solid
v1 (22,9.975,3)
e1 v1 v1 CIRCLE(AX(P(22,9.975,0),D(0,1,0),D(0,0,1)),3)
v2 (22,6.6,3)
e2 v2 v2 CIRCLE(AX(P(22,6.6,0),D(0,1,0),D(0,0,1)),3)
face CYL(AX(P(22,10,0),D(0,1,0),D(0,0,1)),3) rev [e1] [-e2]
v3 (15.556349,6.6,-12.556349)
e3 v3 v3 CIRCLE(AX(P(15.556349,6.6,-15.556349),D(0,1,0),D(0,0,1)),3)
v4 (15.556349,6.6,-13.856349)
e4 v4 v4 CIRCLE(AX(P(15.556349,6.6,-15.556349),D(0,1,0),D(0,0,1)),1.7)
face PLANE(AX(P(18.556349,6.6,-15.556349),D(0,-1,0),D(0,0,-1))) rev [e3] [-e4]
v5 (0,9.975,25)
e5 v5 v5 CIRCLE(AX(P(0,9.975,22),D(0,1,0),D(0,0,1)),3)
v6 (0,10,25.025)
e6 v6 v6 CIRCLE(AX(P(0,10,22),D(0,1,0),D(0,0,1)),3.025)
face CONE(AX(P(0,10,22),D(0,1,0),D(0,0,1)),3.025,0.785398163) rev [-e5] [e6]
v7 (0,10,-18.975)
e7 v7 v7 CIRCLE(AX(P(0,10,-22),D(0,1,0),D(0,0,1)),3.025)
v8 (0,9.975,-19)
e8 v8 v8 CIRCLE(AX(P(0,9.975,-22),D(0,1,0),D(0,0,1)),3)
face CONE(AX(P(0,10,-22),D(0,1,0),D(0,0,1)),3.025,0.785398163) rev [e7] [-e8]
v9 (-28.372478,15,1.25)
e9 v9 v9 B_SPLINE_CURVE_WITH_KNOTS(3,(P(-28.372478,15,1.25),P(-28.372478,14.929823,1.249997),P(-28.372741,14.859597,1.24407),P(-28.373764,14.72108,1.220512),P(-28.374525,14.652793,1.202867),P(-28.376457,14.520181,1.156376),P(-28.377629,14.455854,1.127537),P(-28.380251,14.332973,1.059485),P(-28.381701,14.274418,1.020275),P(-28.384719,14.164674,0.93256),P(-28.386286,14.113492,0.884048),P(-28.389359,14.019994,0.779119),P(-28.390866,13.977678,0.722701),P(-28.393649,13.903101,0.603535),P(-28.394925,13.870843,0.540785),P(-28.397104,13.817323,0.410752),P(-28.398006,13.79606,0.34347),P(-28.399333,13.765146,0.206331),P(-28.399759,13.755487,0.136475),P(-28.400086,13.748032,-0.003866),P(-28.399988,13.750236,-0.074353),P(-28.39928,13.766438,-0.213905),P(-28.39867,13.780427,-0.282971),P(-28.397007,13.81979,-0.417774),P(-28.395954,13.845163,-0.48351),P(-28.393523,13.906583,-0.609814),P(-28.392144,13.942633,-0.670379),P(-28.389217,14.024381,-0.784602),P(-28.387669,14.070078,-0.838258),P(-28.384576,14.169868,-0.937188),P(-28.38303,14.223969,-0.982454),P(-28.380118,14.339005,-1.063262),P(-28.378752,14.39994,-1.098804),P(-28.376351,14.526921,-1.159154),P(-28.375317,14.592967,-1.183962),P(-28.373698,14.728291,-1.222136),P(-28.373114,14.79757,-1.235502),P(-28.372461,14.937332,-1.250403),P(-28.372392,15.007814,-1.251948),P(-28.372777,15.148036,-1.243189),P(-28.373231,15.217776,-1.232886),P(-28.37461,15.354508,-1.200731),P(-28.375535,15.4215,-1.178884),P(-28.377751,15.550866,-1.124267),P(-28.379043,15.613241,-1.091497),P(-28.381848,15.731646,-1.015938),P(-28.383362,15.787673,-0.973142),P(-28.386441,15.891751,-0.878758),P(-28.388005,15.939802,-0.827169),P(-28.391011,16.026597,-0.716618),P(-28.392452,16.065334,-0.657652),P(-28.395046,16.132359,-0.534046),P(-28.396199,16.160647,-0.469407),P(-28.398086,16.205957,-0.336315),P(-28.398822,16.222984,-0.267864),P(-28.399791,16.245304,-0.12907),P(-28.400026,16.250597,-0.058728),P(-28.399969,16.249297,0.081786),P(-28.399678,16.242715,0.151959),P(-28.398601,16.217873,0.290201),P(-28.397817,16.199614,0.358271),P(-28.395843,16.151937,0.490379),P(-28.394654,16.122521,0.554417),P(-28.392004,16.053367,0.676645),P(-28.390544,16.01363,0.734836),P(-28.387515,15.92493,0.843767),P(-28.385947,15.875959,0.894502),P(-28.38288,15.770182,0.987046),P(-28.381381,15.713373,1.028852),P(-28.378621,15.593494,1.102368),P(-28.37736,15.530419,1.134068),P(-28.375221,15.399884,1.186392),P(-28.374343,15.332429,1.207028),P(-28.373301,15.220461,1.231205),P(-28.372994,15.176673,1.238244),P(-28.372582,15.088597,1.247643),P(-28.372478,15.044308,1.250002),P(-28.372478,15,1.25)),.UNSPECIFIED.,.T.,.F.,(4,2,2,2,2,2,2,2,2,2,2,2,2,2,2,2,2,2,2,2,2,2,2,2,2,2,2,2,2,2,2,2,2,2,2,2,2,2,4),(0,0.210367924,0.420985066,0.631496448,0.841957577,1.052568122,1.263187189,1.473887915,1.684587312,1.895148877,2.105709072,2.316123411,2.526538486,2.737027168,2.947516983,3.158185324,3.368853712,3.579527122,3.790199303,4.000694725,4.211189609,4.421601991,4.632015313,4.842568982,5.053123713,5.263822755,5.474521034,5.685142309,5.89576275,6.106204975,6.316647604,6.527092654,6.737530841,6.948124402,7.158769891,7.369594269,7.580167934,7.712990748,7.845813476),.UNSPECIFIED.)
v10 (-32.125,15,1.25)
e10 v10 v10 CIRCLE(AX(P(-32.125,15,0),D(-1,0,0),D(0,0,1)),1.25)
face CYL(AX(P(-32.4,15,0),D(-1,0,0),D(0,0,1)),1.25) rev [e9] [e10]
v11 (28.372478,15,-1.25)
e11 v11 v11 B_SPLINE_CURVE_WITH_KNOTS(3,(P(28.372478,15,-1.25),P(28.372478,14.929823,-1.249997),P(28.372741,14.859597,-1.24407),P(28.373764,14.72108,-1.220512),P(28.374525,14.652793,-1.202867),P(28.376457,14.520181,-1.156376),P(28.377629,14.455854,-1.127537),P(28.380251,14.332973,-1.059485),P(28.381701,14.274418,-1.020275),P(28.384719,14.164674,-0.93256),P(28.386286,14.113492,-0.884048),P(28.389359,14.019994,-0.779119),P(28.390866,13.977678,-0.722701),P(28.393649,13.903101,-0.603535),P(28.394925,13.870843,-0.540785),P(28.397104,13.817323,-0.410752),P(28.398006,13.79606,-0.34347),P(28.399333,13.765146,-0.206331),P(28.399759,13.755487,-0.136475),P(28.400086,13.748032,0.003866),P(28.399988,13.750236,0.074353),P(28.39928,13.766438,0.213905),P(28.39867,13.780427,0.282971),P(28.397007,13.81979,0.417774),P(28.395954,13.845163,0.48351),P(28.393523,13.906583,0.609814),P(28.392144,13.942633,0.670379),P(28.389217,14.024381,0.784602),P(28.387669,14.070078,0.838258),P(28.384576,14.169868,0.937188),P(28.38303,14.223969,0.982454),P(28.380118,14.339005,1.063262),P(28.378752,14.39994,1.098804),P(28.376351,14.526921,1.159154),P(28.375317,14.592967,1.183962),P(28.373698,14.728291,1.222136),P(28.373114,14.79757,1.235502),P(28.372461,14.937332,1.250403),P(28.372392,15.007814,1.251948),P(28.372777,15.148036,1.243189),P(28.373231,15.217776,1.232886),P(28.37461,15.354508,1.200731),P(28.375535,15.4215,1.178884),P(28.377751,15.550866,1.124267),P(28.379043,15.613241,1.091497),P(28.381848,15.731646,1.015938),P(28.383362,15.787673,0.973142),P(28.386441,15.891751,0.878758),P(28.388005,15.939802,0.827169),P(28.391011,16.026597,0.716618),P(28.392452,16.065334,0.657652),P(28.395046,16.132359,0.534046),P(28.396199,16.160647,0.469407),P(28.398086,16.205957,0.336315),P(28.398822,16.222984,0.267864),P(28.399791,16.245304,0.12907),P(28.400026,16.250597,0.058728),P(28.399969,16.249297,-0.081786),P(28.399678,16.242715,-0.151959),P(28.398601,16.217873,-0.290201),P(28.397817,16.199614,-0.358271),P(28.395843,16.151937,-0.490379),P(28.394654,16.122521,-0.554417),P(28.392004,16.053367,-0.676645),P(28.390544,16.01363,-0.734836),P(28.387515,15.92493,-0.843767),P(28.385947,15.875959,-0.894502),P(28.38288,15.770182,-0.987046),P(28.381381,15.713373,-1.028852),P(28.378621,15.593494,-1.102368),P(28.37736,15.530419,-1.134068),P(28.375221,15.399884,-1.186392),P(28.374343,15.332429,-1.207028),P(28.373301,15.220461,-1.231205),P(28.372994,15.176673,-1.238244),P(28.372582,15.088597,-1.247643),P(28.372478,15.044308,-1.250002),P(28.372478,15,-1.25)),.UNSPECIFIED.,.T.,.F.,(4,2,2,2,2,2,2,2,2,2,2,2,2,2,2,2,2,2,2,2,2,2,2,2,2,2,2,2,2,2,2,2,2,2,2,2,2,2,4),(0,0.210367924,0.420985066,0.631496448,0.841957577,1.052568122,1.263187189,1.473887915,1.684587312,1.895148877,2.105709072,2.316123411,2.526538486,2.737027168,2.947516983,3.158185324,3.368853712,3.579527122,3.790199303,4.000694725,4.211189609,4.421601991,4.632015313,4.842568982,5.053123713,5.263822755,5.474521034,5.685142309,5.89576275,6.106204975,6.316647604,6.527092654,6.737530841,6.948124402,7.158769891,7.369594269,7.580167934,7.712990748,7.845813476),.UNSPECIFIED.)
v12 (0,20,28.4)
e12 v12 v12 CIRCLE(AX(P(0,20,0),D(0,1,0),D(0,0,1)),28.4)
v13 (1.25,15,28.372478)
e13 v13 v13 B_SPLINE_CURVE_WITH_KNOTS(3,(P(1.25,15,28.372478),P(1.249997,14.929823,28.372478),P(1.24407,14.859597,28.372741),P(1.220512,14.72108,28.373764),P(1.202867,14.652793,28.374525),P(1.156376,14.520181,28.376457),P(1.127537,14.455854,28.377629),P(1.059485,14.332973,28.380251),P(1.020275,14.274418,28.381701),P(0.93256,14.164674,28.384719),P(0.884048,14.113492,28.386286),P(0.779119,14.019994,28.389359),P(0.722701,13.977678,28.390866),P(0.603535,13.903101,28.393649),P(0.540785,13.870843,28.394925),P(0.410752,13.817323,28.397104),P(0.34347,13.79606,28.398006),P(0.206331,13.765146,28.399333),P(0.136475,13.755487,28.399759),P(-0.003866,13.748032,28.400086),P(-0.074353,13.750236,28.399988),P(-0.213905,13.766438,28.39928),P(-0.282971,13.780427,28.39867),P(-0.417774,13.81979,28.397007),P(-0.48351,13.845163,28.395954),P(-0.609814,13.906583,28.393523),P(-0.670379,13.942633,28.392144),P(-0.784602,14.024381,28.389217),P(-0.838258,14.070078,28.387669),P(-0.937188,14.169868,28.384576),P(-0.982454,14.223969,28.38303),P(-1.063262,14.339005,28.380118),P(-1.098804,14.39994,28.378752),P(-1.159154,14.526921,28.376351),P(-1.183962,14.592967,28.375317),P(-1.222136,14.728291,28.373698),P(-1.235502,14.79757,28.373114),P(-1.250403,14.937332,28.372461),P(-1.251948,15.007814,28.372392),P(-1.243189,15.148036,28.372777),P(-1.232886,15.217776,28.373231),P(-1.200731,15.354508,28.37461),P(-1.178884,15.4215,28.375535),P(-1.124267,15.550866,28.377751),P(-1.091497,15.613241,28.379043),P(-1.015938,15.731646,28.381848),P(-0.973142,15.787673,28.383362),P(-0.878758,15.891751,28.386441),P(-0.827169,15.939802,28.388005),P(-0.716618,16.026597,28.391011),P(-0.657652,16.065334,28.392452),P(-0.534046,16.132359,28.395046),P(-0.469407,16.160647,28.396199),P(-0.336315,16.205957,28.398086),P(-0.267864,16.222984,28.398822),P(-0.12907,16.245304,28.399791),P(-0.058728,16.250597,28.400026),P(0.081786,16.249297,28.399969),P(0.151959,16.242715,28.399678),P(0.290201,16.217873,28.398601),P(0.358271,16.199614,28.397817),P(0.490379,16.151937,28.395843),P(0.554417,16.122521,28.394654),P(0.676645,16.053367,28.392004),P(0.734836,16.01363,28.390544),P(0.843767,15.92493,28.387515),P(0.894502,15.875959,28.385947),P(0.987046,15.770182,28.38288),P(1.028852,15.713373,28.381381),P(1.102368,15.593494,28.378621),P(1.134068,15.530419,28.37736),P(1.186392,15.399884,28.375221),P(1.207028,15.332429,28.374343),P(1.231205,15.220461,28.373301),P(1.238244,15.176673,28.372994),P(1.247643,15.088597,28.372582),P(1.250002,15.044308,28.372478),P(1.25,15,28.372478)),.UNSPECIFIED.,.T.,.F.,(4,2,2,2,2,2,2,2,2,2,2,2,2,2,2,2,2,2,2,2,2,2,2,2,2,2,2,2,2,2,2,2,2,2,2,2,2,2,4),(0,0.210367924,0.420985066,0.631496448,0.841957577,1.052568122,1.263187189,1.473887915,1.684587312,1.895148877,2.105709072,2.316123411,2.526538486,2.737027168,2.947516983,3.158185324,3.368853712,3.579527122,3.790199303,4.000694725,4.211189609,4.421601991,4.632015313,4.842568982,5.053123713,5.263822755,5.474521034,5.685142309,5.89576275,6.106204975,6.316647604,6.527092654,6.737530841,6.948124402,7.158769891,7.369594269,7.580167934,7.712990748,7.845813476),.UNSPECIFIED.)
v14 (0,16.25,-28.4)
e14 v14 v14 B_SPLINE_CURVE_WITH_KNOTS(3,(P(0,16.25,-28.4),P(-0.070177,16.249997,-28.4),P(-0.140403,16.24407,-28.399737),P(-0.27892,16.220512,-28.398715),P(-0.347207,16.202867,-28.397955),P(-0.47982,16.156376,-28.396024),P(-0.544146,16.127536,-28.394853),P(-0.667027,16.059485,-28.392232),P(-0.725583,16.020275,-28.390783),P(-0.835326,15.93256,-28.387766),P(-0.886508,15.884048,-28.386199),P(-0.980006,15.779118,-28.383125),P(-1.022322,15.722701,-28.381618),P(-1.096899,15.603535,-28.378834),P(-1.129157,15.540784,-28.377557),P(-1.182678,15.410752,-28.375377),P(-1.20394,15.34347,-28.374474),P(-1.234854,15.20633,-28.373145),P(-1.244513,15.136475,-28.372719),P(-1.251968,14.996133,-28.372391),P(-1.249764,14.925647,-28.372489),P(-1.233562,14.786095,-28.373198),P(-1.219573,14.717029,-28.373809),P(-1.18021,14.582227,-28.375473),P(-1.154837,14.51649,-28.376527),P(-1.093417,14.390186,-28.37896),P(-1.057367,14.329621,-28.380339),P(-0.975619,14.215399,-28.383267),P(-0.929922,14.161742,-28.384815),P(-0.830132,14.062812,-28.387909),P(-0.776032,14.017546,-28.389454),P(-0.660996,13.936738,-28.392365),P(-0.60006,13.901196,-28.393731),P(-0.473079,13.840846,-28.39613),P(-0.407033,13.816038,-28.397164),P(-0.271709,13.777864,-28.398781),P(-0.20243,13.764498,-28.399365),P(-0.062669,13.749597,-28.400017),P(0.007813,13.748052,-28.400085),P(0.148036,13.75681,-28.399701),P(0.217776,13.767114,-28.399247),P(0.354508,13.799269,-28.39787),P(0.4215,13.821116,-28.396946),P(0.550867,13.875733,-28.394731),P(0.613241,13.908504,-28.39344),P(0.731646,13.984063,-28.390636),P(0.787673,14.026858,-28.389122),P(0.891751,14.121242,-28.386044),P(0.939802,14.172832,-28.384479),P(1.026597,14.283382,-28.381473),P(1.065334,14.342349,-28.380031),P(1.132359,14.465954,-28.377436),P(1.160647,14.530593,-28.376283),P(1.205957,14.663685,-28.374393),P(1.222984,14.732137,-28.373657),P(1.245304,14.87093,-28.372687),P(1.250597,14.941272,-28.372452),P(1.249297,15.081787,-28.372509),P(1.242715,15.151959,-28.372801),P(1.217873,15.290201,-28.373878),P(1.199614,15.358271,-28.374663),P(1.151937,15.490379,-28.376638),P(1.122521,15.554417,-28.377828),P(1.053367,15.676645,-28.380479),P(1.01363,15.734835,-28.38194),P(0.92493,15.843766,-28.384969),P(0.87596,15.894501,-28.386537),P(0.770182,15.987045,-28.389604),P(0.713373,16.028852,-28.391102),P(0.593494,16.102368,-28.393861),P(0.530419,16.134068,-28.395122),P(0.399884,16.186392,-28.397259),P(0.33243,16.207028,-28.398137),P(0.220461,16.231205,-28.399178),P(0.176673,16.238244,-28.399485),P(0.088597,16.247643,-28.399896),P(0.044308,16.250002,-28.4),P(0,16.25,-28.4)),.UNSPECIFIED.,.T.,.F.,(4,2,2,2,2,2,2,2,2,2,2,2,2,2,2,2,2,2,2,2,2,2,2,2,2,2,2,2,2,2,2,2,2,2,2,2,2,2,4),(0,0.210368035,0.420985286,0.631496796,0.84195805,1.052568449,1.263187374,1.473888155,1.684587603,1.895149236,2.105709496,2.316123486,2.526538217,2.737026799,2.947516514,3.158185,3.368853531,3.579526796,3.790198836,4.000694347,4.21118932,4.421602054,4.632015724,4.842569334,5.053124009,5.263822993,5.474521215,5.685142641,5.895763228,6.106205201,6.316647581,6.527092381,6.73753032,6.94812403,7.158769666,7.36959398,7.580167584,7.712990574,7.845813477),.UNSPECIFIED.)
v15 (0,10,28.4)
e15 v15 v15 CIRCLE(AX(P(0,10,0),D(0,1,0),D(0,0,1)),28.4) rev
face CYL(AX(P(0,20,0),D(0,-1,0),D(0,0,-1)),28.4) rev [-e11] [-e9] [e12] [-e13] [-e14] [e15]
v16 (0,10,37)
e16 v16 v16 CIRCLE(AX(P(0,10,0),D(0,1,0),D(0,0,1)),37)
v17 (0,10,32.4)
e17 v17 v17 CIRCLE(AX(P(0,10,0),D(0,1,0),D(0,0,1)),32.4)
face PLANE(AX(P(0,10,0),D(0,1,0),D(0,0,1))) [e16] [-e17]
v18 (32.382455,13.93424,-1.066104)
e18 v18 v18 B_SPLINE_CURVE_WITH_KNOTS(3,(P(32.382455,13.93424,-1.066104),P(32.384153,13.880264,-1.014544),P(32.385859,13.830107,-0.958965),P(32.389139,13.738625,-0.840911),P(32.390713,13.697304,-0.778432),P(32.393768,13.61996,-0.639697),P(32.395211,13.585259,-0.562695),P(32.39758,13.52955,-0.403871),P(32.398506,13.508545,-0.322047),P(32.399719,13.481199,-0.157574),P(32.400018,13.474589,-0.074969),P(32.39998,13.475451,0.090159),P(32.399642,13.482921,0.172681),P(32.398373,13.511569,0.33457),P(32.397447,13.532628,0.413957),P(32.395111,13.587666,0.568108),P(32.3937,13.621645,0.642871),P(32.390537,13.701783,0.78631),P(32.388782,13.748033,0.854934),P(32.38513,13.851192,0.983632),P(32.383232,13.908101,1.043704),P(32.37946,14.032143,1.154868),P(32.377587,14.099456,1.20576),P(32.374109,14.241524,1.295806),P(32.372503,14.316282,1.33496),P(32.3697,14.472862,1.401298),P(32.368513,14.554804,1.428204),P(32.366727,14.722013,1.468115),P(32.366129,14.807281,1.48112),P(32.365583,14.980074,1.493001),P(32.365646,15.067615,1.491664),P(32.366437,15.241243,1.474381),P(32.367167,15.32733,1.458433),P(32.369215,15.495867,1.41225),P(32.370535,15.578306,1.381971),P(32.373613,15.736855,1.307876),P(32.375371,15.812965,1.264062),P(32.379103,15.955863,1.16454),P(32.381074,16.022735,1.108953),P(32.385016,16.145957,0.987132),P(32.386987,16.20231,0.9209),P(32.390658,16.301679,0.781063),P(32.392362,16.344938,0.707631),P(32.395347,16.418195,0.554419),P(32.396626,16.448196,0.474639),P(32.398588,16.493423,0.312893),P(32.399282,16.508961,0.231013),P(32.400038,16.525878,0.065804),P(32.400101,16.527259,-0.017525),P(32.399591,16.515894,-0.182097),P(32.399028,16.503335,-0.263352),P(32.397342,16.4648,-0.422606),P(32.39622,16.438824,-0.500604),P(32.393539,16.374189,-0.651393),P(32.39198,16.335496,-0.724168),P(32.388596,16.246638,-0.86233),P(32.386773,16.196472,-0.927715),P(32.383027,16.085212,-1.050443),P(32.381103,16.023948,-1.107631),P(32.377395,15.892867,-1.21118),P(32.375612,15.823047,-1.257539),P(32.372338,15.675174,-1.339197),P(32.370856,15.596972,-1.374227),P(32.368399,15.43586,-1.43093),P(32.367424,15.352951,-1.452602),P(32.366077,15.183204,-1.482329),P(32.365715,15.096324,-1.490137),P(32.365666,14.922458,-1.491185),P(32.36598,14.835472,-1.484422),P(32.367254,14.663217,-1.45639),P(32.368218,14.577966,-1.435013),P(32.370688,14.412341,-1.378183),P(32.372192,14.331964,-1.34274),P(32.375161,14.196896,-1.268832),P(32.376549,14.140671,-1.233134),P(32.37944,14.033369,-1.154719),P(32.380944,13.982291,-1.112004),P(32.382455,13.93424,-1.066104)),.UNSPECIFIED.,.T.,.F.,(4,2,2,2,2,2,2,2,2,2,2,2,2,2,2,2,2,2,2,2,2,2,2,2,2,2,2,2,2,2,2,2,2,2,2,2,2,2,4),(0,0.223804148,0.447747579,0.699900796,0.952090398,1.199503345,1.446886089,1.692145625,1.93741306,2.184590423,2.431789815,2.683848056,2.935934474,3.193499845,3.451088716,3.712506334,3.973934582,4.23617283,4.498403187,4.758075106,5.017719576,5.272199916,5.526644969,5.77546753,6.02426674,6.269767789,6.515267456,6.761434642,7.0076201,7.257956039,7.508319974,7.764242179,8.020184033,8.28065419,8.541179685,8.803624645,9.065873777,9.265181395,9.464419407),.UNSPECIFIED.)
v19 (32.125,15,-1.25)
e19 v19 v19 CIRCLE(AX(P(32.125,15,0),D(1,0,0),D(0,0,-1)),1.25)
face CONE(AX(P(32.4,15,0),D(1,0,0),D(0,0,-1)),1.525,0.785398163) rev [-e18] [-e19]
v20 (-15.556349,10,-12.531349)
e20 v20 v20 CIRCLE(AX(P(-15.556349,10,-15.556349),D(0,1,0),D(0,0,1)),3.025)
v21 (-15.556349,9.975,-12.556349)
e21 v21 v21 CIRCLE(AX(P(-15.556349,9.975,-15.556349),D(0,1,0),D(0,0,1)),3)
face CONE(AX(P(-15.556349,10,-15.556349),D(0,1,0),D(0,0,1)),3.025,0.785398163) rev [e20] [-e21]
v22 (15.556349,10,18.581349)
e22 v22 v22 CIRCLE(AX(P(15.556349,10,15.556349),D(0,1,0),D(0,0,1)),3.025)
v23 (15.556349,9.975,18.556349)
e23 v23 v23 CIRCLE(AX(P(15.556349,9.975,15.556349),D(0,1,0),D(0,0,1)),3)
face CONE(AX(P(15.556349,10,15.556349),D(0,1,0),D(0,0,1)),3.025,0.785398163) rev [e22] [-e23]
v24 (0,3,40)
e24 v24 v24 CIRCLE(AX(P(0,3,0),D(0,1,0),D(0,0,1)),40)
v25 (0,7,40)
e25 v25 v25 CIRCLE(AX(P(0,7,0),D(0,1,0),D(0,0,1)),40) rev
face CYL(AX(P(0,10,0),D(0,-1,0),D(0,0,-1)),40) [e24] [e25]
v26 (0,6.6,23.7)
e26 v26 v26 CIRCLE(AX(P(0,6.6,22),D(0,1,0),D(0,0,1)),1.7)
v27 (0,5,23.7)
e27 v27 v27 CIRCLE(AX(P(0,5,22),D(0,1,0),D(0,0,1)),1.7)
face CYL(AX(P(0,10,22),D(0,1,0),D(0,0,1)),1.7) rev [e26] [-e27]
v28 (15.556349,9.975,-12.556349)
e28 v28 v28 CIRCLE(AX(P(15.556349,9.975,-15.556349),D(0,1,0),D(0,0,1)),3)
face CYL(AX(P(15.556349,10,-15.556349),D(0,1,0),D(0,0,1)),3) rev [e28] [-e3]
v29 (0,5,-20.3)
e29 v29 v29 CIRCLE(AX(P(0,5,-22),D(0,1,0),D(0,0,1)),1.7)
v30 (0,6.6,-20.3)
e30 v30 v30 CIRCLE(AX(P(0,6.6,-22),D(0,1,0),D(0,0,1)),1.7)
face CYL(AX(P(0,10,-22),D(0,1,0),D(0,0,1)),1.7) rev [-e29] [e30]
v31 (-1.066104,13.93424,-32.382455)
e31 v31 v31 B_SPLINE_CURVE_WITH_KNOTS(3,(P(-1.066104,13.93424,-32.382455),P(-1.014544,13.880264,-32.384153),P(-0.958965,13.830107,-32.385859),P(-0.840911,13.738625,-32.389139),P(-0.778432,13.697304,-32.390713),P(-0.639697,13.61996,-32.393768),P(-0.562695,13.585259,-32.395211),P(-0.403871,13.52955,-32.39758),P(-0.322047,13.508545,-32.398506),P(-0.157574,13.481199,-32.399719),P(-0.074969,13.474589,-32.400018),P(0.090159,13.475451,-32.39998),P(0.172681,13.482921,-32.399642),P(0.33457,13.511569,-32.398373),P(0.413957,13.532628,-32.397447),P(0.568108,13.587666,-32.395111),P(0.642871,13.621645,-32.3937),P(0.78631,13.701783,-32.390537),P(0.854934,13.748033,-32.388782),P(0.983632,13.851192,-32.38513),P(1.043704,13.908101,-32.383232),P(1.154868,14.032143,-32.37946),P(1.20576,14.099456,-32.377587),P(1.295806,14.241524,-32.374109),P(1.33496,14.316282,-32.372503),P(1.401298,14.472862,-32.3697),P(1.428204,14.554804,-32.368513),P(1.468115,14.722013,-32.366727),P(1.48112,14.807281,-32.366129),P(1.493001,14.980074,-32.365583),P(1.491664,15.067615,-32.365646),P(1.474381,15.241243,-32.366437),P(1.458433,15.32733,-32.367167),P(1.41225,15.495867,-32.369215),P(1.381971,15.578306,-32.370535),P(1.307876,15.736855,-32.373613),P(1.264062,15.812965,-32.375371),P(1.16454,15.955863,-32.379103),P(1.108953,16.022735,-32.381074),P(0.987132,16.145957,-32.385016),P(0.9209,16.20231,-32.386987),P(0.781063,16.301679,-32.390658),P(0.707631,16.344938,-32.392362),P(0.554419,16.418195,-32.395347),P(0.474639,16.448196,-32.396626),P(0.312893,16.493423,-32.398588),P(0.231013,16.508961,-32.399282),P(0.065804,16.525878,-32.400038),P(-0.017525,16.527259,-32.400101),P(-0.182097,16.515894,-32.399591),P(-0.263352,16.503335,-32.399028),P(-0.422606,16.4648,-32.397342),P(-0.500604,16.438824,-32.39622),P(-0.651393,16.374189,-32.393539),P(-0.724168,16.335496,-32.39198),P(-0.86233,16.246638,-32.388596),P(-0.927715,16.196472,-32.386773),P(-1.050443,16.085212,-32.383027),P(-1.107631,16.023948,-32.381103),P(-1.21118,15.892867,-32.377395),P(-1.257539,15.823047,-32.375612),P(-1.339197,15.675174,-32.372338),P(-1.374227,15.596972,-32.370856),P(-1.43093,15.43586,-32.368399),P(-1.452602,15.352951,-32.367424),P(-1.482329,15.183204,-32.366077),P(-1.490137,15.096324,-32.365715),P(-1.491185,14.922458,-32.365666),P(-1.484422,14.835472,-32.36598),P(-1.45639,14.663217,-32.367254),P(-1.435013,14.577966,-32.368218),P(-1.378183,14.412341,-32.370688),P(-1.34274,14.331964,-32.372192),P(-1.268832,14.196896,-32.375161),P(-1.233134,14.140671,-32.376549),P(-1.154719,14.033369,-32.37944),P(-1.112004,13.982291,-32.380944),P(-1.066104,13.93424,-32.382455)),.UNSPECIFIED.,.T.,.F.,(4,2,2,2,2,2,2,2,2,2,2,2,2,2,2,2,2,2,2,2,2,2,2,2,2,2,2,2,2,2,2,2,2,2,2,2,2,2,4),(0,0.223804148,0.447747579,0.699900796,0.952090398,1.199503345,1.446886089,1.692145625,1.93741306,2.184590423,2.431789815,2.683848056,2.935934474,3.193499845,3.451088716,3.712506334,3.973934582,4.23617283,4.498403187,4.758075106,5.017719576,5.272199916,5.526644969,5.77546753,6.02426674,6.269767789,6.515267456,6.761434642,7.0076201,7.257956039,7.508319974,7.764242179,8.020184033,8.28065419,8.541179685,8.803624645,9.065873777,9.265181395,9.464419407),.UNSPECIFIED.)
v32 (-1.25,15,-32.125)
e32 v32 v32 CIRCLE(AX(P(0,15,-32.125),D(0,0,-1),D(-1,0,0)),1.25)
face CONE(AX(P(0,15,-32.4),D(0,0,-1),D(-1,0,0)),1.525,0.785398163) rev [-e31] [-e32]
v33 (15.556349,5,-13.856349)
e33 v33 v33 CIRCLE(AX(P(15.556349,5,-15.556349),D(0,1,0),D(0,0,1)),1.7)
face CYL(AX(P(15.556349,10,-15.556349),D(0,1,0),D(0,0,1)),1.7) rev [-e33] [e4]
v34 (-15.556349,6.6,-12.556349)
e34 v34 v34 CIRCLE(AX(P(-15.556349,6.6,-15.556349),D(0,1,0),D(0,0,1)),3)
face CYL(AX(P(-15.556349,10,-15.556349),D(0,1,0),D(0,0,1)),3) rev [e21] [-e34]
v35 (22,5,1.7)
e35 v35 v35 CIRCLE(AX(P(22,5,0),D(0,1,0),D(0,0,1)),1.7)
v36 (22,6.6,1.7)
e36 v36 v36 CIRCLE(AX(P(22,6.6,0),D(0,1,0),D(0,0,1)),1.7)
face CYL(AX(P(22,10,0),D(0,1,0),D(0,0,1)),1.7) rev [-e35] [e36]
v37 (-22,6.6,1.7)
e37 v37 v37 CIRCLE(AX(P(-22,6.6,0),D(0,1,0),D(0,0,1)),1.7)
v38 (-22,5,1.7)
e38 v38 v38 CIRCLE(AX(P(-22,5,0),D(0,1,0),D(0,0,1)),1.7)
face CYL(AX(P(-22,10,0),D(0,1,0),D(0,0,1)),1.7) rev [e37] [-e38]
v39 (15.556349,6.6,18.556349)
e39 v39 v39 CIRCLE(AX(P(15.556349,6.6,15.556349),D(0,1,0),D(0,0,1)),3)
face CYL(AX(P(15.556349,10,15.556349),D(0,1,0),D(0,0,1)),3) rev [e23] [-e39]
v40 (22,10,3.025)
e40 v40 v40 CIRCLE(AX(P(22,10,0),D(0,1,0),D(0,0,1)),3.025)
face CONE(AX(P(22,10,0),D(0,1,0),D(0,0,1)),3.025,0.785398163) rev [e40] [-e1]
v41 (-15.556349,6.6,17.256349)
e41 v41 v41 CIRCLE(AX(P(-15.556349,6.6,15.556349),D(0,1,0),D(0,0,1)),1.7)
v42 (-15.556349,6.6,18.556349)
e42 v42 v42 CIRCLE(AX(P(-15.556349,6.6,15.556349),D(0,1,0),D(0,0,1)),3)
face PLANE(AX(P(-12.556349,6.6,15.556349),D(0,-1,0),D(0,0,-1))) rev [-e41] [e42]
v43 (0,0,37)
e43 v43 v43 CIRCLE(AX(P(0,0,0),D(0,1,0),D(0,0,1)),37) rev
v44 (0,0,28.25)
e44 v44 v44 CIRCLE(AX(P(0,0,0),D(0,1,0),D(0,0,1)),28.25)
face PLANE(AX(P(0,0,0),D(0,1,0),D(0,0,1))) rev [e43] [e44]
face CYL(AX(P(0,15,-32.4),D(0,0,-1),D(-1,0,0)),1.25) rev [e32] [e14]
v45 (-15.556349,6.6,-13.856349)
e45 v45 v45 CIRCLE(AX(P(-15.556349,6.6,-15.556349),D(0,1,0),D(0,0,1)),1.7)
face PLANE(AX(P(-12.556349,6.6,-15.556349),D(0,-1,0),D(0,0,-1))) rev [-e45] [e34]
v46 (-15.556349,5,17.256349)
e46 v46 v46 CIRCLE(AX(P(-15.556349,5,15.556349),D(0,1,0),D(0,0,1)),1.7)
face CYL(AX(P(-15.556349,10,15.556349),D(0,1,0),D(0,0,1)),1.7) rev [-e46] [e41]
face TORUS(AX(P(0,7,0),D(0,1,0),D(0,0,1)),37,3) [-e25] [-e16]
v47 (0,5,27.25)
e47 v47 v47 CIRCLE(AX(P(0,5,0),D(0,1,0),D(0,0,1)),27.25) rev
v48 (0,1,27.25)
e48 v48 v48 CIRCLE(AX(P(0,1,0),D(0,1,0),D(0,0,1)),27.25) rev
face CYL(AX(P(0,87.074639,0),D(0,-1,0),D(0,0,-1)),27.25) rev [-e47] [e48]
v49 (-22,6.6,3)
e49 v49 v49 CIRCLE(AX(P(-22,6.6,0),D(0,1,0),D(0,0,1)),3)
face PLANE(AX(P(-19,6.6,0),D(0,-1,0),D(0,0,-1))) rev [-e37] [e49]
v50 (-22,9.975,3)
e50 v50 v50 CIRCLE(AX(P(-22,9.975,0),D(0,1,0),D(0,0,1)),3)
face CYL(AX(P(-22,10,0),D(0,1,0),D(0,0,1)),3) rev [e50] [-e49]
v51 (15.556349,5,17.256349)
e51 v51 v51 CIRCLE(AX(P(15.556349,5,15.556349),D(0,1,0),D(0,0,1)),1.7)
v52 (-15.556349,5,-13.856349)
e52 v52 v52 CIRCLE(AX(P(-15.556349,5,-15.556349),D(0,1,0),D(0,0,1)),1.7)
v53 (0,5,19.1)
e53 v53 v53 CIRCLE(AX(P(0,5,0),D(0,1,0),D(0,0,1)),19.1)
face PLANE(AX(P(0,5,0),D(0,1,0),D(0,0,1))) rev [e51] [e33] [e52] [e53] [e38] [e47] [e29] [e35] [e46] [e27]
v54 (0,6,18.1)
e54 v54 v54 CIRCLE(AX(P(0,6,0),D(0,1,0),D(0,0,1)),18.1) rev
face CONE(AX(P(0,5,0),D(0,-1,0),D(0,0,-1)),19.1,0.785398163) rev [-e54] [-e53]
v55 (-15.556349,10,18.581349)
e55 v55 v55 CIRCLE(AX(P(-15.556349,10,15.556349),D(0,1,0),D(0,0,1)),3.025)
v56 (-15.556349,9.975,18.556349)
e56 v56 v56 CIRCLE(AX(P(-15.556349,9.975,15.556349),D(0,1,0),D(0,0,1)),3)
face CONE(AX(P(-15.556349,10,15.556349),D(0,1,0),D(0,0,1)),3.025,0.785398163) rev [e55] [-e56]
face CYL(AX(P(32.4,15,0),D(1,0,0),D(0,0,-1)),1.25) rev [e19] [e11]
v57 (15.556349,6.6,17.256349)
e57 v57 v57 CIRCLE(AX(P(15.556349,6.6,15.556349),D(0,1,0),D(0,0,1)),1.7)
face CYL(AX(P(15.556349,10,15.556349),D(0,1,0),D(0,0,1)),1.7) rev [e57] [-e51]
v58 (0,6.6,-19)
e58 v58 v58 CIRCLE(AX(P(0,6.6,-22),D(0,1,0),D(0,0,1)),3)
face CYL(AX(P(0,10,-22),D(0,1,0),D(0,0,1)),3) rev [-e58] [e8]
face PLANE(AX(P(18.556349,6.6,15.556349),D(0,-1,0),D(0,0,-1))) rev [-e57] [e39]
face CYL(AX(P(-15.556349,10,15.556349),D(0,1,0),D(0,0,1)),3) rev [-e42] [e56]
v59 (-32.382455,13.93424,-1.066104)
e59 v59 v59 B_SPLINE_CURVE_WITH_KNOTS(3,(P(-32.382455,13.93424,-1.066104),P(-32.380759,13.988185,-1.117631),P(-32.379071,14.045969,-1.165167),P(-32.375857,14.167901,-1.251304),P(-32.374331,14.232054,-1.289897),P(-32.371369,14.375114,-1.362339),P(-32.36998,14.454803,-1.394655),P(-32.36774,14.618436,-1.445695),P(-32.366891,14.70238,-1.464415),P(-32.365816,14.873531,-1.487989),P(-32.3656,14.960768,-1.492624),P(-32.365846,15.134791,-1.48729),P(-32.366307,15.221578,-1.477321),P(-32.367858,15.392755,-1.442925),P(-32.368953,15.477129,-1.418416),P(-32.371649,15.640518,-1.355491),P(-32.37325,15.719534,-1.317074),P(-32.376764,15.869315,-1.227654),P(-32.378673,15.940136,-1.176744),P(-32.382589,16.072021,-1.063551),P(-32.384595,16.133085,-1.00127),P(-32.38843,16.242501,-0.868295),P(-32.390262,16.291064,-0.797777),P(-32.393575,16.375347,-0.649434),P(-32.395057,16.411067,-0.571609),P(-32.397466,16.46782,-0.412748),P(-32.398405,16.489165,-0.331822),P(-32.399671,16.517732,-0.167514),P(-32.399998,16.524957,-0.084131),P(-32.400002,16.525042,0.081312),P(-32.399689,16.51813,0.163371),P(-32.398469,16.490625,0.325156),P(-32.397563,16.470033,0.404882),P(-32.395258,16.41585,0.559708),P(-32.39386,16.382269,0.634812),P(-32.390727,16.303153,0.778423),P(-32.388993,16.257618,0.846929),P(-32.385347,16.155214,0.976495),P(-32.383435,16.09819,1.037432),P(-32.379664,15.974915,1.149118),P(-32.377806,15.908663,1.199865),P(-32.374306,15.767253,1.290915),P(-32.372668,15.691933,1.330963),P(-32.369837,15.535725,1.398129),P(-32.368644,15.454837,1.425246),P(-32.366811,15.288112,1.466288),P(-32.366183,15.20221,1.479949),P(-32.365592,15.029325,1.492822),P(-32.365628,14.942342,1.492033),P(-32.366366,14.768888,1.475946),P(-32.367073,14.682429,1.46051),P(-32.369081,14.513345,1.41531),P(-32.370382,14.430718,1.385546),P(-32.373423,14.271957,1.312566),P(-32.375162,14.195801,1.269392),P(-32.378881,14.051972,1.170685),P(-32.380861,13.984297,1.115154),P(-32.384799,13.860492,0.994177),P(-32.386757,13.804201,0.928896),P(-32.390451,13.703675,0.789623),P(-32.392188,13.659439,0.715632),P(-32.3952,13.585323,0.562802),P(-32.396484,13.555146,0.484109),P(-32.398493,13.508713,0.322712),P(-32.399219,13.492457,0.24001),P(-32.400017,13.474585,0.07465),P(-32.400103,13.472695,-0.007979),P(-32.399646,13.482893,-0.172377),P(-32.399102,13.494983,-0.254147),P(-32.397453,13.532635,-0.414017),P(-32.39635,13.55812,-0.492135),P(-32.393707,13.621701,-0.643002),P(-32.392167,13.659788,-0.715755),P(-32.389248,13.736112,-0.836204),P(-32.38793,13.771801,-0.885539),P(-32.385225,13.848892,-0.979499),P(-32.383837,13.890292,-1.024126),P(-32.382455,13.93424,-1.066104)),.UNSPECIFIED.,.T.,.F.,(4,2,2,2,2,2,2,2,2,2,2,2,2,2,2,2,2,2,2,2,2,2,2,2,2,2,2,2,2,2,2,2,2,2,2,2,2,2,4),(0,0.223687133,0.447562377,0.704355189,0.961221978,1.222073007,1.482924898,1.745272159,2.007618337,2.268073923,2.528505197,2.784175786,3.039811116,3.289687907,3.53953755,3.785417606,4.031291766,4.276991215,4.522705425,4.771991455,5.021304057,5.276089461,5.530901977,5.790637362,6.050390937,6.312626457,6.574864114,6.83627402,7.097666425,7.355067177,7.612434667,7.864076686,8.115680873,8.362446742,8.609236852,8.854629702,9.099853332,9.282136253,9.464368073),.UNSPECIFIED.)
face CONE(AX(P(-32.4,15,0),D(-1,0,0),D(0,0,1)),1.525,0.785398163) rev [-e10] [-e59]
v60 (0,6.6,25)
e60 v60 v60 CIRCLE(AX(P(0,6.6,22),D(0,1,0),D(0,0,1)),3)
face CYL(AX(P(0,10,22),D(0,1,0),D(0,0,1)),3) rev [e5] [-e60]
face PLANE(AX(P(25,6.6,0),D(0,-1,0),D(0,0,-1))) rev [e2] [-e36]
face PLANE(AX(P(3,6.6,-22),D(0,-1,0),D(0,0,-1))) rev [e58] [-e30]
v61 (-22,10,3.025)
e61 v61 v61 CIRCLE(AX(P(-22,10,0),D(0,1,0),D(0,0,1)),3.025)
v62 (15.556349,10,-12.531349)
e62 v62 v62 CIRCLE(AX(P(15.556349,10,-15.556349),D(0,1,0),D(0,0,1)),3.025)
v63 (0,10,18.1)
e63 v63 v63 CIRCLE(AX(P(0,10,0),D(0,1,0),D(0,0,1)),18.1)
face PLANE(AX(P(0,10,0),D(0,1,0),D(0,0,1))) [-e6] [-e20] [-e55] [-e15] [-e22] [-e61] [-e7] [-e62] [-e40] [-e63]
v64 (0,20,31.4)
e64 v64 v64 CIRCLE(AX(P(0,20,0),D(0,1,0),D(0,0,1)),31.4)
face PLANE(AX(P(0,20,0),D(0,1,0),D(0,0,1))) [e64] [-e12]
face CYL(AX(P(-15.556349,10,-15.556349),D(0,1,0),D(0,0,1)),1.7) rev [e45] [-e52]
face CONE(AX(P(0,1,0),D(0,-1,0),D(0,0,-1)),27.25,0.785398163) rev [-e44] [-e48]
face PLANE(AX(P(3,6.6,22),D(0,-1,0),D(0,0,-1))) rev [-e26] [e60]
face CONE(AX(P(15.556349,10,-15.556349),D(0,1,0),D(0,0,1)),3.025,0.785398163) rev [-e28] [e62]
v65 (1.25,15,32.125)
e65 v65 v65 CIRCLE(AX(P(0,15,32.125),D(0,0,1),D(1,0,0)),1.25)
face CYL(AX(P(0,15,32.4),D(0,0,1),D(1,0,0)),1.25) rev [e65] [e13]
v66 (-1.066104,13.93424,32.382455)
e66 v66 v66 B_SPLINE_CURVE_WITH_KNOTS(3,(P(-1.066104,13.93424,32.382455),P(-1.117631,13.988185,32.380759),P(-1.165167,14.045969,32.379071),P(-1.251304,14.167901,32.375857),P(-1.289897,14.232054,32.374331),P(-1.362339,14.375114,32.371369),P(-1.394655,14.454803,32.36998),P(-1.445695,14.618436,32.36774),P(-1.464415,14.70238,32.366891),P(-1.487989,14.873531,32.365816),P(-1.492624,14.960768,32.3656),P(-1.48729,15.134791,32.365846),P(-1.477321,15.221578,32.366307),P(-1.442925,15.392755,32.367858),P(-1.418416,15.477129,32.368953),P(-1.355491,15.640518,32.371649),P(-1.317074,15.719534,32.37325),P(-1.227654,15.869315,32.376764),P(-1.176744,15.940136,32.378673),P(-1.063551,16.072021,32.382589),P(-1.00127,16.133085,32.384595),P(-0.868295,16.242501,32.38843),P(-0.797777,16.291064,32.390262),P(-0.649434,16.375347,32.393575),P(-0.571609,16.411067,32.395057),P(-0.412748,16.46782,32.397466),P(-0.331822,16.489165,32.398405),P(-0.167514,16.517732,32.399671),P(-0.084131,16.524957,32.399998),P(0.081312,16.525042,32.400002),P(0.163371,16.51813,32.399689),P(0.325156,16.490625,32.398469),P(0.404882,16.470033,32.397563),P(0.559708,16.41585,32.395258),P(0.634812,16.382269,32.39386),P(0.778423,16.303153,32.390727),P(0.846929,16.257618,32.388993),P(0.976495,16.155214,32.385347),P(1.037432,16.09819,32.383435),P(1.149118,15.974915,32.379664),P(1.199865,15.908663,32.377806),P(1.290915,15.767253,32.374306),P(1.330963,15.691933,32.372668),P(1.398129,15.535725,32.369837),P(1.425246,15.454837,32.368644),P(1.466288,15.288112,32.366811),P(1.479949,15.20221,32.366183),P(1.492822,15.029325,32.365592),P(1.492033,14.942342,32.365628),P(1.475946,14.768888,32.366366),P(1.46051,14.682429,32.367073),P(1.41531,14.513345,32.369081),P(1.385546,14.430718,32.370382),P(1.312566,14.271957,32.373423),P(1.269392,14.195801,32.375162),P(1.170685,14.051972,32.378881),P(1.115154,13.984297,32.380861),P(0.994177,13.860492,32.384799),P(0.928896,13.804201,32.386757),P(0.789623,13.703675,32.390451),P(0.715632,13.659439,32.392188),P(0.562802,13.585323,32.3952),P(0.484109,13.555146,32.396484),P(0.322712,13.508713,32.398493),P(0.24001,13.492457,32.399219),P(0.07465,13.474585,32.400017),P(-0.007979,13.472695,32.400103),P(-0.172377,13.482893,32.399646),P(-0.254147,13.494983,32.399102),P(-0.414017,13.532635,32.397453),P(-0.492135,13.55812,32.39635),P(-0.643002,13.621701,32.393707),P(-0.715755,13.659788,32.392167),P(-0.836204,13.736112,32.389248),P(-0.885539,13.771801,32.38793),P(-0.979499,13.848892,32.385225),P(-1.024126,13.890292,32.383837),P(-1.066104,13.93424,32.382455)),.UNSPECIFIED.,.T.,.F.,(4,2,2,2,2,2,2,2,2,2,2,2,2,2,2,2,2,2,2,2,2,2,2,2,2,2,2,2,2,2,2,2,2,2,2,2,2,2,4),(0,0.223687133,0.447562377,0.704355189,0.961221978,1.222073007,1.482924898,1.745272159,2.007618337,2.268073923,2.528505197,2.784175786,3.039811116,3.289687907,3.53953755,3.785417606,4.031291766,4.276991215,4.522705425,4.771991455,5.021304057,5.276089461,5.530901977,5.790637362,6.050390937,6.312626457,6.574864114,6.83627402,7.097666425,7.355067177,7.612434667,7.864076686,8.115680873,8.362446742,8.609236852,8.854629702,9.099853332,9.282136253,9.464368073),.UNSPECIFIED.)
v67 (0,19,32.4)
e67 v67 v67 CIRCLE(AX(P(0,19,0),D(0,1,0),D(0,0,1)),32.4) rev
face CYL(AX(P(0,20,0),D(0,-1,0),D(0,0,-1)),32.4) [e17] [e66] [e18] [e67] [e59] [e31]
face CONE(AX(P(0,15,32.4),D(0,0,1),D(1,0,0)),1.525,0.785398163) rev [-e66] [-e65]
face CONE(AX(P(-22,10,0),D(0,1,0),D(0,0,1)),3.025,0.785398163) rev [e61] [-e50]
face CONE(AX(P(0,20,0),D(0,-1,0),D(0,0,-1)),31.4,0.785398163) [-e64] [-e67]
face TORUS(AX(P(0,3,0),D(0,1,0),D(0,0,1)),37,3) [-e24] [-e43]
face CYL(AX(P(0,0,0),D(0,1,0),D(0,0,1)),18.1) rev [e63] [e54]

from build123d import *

# Parameters (mm, degrees)
SKETCH_1_R               = 40
EXTRUDE_1_DEPTH          = 10
SKETCH_2_R               = 27.25
CUT_EXTRUDE_1_DEPTH      = 5
SKETCH_4_R               = 32.4
SKETCH_4_R_2             = 28.4
EXTRUDE_2_DEPTH          = 10
SKETCH_5_R               = 18.1
CUT_EXTRUDE_2_DEPTH      = 58.445626465
PATTERN_CIRCULAR_1_COUNT = 8
PATTERN_CIRCULAR_2_COUNT = 4
CHAMFER_1_SIZE           = 1
CHAMFER_2_SIZE           = 1
FILLET_1_R               = 3
CHAMFER_3_SIZE           = 1


# Read off the part's stored shape, not the designer's step: M3 螺纹孔1
with BuildPart() as part:
    # 草图1 → 凸台-拉伸1 (new body)
    with BuildSketch(Plane(origin=(0, 0, 0), x_dir=(1, 0, 0), z_dir=(0, 1, 0))):
        with Locations(Location((0, 0, 0), (0, 0, 270))):
            Circle(SKETCH_1_R)
    extrude(amount=EXTRUDE_1_DEPTH)

    # 草图2 → 切除-拉伸1 (cut)
    with BuildSketch(Plane.XZ):
        with Locations(Location((0, 0, 0), (0, 0, 270))):
            Circle(SKETCH_2_R)
    extrude(amount=-CUT_EXTRUDE_1_DEPTH, mode=Mode.SUBTRACT)

    # 草图4 → 凸台-拉伸2 (add)
    with BuildSketch(Plane(origin=(0, 10, 0), x_dir=(1, 0, 0), z_dir=(0, 1, 0))):
        with Locations(Location((0, 0, 0), (0, 0, 270))):
            Circle(SKETCH_4_R)
        with Locations(Location((0, 0, 0), (0, 0, 270))):
            Circle(SKETCH_4_R_2, mode=Mode.SUBTRACT)
    extrude(amount=EXTRUDE_2_DEPTH)

    # 草图5 → 切除-拉伸2 (cut, through all)
    with BuildSketch(Plane(origin=(0, 10, 0), x_dir=(1, 0, 0), z_dir=(0, 1, 0))):
        with Locations(Location((0, 0, 0), (0, 0, 270))):
            Circle(SKETCH_5_R)
    extrude(amount=-CUT_EXTRUDE_2_DEPTH, mode=Mode.SUBTRACT)

    # 草图12 → 打孔尺寸(%根据)内六角圆柱头螺钉的类型3 (revolve, cut)
    with BuildSketch(Plane(origin=(0, 10, -22), x_dir=(0, 0, 1), z_dir=(1, 0, 0))):
        Polygon((0, 0), (0, 10), (1.7, 10), (1.7, 3.4), (3, 3.4), (3, 0.025), (3.025, 0), align=None)
    hole_wizard_3 = revolve(axis=Axis((0, 16.35, -22), (0, -1, 0)), mode=Mode.SUBTRACT)

    # 阵列(圆周)1: 打孔尺寸(%根据)内六角圆柱头螺钉的类型3 ×8 about axis
    pattern_circular_1_axis = Axis((0, 0, 0), (0, 1, 0))
    for i in range(1, PATTERN_CIRCULAR_1_COUNT):
        add(hole_wizard_3.rotate(pattern_circular_1_axis, i * 360 / PATTERN_CIRCULAR_1_COUNT), mode=Mode.SUBTRACT)

    # M3 螺纹孔1 outline → M3 螺纹孔1 (revolve, cut)
    with BuildSketch(Plane(origin=(0, 15, 0), x_dir=(0, 1, 0), z_dir=(0, 0, -1))):
        Polygon((0, -32.400010655), (1.525010655, -32.400010655), (1.25, -32.125), (1.25, -28.372463058), (0, -28.372463058), align=None)
    hole_wizard_m3_1 = revolve(axis=Axis((0, 15, 0), (1, 0, 0)), mode=Mode.SUBTRACT)

    # 阵列(圆周)2: M3 螺纹孔1 ×4 about axis
    pattern_circular_2_axis = Axis((0, 20, 0), (0, -1, 0))
    for i in range(1, PATTERN_CIRCULAR_2_COUNT):
        add(hole_wizard_m3_1.rotate(pattern_circular_2_axis, i * 360 / PATTERN_CIRCULAR_2_COUNT), mode=Mode.SUBTRACT)

    # 倒角1
    chamfer_1_edges = [part.edges().sort_by_distance(p)[0] for p in [
        (0, 20, -32.4),
    ]]
    chamfer(chamfer_1_edges, length=CHAMFER_1_SIZE)

    # 倒角2
    chamfer_2_edges = [part.edges().sort_by_distance(p)[0] for p in [
        (0, 0, 27.25),
    ]]
    chamfer(chamfer_2_edges, length=CHAMFER_2_SIZE)

    # 圆角1
    fillet_1_edges = [part.edges().sort_by_distance(p)[0] for p in [
        (0, 0, -40),
        (0, 10, -40),
    ]]
    fillet(fillet_1_edges, radius=FILLET_1_R)

    # 倒角3
    chamfer_3_edges = [part.edges().sort_by_distance(p)[0] for p in [
        (0, 5, -18.1),
    ]]
    chamfer(chamfer_3_edges, length=CHAMFER_3_SIZE)


solid = part.part
